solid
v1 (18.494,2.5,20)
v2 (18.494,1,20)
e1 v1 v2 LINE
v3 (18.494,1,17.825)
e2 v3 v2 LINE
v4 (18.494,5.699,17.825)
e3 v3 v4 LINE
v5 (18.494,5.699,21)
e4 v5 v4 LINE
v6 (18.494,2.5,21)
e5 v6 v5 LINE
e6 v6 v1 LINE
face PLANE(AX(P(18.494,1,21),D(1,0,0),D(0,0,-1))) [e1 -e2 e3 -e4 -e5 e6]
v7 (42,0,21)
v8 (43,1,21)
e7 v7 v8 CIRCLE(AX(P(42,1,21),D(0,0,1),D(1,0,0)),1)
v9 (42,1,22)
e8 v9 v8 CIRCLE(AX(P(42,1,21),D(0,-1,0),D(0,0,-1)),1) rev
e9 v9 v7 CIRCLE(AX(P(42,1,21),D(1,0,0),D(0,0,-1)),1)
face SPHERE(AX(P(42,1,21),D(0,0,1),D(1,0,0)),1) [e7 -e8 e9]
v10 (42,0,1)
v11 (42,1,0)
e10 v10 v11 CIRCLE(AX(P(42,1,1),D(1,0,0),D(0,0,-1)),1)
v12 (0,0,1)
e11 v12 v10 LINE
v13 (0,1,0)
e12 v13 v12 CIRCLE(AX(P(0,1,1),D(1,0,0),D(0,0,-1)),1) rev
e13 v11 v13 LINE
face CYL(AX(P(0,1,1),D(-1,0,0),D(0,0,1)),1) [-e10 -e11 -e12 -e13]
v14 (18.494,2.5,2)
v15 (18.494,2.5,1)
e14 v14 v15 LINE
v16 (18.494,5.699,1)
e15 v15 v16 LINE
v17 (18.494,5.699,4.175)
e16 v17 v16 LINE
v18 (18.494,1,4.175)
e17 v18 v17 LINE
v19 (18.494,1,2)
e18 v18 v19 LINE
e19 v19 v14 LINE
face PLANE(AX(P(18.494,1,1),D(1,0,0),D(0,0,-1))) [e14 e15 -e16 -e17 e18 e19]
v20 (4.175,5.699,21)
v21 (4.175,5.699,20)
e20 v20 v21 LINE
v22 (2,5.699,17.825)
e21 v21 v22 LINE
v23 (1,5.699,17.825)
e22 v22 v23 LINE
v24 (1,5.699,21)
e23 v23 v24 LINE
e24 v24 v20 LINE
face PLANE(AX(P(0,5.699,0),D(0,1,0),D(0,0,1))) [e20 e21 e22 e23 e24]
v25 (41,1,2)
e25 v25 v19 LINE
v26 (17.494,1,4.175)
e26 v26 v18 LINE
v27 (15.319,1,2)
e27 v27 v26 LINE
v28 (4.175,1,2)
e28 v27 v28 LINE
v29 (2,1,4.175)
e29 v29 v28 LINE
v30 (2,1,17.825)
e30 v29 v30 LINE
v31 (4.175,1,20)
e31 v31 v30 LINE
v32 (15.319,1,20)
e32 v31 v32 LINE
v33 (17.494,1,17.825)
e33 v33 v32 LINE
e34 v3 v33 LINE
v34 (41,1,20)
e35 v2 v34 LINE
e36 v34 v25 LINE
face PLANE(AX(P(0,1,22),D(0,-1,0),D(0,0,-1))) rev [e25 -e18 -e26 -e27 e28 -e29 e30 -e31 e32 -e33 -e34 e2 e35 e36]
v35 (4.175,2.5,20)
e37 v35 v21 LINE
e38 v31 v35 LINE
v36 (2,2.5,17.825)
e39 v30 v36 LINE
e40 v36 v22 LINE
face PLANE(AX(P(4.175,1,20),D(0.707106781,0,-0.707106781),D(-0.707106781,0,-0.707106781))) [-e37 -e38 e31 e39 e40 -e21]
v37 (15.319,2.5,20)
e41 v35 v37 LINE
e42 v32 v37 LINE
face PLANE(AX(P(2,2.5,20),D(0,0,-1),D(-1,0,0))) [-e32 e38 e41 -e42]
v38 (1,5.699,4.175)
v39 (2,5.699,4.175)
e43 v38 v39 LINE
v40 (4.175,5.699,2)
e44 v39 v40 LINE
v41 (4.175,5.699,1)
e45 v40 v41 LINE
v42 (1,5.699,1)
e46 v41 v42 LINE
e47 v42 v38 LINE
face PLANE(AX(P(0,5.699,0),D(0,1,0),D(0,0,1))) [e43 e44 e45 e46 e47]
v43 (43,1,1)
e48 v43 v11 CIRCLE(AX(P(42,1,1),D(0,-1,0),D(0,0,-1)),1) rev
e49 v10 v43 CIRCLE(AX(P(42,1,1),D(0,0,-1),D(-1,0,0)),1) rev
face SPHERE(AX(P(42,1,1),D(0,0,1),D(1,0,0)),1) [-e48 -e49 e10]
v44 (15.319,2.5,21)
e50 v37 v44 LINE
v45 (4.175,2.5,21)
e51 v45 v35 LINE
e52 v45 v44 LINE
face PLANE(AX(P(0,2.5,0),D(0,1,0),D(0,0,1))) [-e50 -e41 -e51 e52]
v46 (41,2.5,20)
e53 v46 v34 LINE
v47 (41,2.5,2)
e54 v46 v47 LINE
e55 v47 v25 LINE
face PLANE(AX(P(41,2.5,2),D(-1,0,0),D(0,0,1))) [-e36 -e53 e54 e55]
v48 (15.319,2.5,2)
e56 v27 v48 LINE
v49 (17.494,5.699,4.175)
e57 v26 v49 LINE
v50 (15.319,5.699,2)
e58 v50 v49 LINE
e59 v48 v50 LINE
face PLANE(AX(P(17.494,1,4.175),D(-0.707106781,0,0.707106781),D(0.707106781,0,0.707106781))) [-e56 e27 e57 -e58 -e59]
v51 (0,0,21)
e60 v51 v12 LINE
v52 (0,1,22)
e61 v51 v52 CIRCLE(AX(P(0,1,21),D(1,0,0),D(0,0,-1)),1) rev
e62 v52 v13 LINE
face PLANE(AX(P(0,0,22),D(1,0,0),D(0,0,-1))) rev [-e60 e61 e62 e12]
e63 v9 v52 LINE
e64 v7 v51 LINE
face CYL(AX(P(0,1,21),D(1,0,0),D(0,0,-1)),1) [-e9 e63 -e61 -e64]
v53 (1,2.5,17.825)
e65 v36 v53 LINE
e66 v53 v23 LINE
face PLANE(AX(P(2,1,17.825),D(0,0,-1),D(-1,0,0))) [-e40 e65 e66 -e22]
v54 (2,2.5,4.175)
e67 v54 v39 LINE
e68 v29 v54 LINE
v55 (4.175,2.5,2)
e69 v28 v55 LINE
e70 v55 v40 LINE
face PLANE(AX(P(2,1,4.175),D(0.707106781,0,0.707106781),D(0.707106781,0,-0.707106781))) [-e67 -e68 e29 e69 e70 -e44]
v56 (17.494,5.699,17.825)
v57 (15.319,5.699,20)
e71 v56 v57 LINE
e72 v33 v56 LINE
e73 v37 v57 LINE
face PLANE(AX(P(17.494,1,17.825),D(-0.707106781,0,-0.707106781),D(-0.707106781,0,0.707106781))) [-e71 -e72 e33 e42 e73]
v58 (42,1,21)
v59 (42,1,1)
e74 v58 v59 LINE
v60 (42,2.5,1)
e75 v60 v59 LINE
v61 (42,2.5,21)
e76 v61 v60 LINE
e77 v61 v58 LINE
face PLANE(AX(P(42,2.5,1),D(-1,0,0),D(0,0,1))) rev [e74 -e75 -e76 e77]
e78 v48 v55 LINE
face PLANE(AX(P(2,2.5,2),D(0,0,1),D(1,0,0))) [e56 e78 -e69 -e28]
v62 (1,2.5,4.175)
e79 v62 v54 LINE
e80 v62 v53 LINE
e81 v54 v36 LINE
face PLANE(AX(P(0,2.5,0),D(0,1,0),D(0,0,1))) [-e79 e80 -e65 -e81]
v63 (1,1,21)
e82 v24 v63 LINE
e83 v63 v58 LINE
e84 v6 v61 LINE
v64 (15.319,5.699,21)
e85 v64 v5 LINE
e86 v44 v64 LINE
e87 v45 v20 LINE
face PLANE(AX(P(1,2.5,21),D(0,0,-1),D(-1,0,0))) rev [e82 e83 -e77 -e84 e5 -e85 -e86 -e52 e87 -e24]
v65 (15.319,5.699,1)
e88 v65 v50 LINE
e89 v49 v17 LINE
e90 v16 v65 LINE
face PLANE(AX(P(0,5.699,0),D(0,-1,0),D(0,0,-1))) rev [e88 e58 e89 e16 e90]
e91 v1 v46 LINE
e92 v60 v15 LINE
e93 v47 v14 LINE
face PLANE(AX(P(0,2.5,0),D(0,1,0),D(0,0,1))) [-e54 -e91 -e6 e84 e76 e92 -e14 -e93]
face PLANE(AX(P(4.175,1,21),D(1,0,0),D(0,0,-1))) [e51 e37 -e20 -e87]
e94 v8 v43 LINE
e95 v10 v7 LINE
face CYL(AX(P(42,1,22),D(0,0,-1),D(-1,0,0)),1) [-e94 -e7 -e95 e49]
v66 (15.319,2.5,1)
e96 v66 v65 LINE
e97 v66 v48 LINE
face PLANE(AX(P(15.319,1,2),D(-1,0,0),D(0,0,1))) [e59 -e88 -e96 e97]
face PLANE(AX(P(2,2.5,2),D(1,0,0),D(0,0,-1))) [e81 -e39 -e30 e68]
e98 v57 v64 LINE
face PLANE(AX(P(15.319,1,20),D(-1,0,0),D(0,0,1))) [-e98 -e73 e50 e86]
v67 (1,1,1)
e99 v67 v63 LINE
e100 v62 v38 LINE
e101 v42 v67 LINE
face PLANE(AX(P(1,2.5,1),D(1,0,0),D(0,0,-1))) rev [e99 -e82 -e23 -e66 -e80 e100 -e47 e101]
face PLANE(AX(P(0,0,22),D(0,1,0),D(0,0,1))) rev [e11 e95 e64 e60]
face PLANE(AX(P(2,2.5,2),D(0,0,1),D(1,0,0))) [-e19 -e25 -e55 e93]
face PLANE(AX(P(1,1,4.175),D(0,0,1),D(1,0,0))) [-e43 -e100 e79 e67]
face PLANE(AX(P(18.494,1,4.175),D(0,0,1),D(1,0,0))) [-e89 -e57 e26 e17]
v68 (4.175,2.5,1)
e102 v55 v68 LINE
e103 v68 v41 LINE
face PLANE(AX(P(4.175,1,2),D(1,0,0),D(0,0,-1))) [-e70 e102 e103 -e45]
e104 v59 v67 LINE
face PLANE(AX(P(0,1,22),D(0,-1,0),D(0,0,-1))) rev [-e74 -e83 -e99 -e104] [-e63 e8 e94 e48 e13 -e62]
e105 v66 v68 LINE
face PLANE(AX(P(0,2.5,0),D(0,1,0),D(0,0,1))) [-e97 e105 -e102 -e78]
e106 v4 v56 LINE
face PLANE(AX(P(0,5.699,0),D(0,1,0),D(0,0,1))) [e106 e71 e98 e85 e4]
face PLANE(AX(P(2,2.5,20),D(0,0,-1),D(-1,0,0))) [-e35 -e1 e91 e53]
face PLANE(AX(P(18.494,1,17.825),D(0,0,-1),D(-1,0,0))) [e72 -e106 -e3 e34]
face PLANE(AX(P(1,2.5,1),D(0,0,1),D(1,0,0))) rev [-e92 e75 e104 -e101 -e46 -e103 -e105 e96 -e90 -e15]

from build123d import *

# Parameters (mm, degrees)
SKETCH1_W                = 43
SKETCH1_H                = 1
BOSS_EXTRUDE1_DEPTH      = 22
FILLET1_R                = 1
SKETCH2_W                = 41
SKETCH2_H                = 20
SKETCH2_W_2              = 39
SKETCH2_H_2              = 18
BOSS_EXTRUDE2_DEPTH      = 1.5
BOSS_EXTRUDE3_DEPTH      = 3.199
BOSS_EXTRUDE3_DEPTH_BACK = 1.5


with BuildPart() as part:
    # Sketch1 → Boss-Extrude1 (new body)
    with BuildSketch(Plane.XY):
        with Locations((21.5, 0.5)):
            Rectangle(SKETCH1_W, SKETCH1_H)
    extrude(amount=BOSS_EXTRUDE1_DEPTH)

    # Fillet1
    # the kernel refuses this fillet: 1 mm, written as the material it takes off along each edge
    with BuildSketch(Plane(origin=(42, 1, 21), x_dir=(1, 0, 0), z_dir=(0, -1, 0))) as fillet1_piece_1_section:
        Polygon((0, 0), (FILLET1_R * 1.02, 0), (FILLET1_R * 1.02, FILLET1_R * 1.02), (0, FILLET1_R * 1.02), align=None)
    fillet1_piece_1 = extrude(amount=FILLET1_R * 1.02, mode=Mode.PRIVATE)
    fillet1_piece_1 = fillet1_piece_1 - Plane(origin=(42, 1, 21), x_dir=(-0.7071067811865475, 0, -0.7071067811865475), z_dir=(0, -1, 0)) * Sphere(FILLET1_R, mode=Mode.PRIVATE)
    add(fillet1_piece_1, mode=Mode.SUBTRACT)
    with BuildSketch(Plane(origin=(42, 1, 1), x_dir=(1, 0, 0), z_dir=(0, -1, 0))) as fillet1_piece_2_section:
        Polygon((0, 0), (FILLET1_R * 1.02, 0), (FILLET1_R * 1.02, -FILLET1_R * 1.02), (0, -FILLET1_R * 1.02), align=None)
    fillet1_piece_2 = extrude(amount=FILLET1_R * 1.02, mode=Mode.PRIVATE)
    fillet1_piece_2 = fillet1_piece_2 - Plane(origin=(42, 1, 1), x_dir=(-0.7071067811865475, 0, 0.7071067811865475), z_dir=(0, -1, 0)) * Sphere(FILLET1_R, mode=Mode.PRIVATE)
    add(fillet1_piece_2, mode=Mode.SUBTRACT)
    with BuildSketch(Plane(origin=(-2.5, 0, 0), x_dir=(0, 0, 1), z_dir=(1, 0, 0))) as fillet1_piece_3:
        with BuildLine():
            CenterArc((FILLET1_R, -FILLET1_R), FILLET1_R, 90, 90)
            Line((0, -FILLET1_R), (0, 0))
            Line((0, 0), (FILLET1_R, 0))
        make_face()
    extrude(amount=44.5, mode=Mode.SUBTRACT)
    with BuildSketch(Plane(origin=(-2.5, 0, 22), x_dir=(0, 0, -1), z_dir=(1, 0, 0))) as fillet1_piece_4:
        with BuildLine():
            CenterArc((FILLET1_R, FILLET1_R), FILLET1_R, 180, 90)
            Line((0, FILLET1_R), (0, 0))
            Line((0, 0), (FILLET1_R, 0))
        make_face()
    extrude(amount=44.5, mode=Mode.SUBTRACT)
    with BuildSketch(Plane(origin=(43, 0, 1), x_dir=(-1, 0, 0), z_dir=(0, 0, 1))) as fillet1_piece_5:
        with BuildLine():
            CenterArc((FILLET1_R, -FILLET1_R), FILLET1_R, 90, 90)
            Line((0, -FILLET1_R), (0, 0))
            Line((0, 0), (FILLET1_R, 0))
        make_face()
    extrude(amount=20, mode=Mode.SUBTRACT)

    # Sketch2 → Boss-Extrude2 (add)
    with BuildSketch(Plane(origin=(0, 1, 0), x_dir=(1, 0, 0), z_dir=(0, 1, 0))):
        with Locations((21.5, -11)):
            Rectangle(SKETCH2_W, SKETCH2_H)
        with Locations((21.5, -11)):
            Rectangle(SKETCH2_W_2, SKETCH2_H_2, mode=Mode.SUBTRACT)
    extrude(amount=BOSS_EXTRUDE2_DEPTH)

    # Sketch3 → Boss-Extrude3 (add, two sides: drawn at the far end of the back side and taken through both)
    with BuildSketch(Plane(origin=(0, 2.5, 0), x_dir=(1, 0, 0), z_dir=(0, 1, 0)).offset(-BOSS_EXTRUDE3_DEPTH_BACK)):
        Polygon((1, -21), (4.175, -21), (4.175, -20), (2, -17.825), (1, -17.825), align=None)
        Polygon((1, -1), (1, -4.175), (2, -4.175), (4.175, -2), (4.175, -1), align=None)
        Polygon((18.494, -21), (18.494, -17.825), (17.494, -17.825), (15.319, -20), (15.319, -21), align=None)
        Polygon((18.494, -1), (18.494, -4.175), (17.494, -4.175), (15.319, -2), (15.319, -1), align=None)
    extrude(amount=BOSS_EXTRUDE3_DEPTH + BOSS_EXTRUDE3_DEPTH_BACK)


solid = part.part
